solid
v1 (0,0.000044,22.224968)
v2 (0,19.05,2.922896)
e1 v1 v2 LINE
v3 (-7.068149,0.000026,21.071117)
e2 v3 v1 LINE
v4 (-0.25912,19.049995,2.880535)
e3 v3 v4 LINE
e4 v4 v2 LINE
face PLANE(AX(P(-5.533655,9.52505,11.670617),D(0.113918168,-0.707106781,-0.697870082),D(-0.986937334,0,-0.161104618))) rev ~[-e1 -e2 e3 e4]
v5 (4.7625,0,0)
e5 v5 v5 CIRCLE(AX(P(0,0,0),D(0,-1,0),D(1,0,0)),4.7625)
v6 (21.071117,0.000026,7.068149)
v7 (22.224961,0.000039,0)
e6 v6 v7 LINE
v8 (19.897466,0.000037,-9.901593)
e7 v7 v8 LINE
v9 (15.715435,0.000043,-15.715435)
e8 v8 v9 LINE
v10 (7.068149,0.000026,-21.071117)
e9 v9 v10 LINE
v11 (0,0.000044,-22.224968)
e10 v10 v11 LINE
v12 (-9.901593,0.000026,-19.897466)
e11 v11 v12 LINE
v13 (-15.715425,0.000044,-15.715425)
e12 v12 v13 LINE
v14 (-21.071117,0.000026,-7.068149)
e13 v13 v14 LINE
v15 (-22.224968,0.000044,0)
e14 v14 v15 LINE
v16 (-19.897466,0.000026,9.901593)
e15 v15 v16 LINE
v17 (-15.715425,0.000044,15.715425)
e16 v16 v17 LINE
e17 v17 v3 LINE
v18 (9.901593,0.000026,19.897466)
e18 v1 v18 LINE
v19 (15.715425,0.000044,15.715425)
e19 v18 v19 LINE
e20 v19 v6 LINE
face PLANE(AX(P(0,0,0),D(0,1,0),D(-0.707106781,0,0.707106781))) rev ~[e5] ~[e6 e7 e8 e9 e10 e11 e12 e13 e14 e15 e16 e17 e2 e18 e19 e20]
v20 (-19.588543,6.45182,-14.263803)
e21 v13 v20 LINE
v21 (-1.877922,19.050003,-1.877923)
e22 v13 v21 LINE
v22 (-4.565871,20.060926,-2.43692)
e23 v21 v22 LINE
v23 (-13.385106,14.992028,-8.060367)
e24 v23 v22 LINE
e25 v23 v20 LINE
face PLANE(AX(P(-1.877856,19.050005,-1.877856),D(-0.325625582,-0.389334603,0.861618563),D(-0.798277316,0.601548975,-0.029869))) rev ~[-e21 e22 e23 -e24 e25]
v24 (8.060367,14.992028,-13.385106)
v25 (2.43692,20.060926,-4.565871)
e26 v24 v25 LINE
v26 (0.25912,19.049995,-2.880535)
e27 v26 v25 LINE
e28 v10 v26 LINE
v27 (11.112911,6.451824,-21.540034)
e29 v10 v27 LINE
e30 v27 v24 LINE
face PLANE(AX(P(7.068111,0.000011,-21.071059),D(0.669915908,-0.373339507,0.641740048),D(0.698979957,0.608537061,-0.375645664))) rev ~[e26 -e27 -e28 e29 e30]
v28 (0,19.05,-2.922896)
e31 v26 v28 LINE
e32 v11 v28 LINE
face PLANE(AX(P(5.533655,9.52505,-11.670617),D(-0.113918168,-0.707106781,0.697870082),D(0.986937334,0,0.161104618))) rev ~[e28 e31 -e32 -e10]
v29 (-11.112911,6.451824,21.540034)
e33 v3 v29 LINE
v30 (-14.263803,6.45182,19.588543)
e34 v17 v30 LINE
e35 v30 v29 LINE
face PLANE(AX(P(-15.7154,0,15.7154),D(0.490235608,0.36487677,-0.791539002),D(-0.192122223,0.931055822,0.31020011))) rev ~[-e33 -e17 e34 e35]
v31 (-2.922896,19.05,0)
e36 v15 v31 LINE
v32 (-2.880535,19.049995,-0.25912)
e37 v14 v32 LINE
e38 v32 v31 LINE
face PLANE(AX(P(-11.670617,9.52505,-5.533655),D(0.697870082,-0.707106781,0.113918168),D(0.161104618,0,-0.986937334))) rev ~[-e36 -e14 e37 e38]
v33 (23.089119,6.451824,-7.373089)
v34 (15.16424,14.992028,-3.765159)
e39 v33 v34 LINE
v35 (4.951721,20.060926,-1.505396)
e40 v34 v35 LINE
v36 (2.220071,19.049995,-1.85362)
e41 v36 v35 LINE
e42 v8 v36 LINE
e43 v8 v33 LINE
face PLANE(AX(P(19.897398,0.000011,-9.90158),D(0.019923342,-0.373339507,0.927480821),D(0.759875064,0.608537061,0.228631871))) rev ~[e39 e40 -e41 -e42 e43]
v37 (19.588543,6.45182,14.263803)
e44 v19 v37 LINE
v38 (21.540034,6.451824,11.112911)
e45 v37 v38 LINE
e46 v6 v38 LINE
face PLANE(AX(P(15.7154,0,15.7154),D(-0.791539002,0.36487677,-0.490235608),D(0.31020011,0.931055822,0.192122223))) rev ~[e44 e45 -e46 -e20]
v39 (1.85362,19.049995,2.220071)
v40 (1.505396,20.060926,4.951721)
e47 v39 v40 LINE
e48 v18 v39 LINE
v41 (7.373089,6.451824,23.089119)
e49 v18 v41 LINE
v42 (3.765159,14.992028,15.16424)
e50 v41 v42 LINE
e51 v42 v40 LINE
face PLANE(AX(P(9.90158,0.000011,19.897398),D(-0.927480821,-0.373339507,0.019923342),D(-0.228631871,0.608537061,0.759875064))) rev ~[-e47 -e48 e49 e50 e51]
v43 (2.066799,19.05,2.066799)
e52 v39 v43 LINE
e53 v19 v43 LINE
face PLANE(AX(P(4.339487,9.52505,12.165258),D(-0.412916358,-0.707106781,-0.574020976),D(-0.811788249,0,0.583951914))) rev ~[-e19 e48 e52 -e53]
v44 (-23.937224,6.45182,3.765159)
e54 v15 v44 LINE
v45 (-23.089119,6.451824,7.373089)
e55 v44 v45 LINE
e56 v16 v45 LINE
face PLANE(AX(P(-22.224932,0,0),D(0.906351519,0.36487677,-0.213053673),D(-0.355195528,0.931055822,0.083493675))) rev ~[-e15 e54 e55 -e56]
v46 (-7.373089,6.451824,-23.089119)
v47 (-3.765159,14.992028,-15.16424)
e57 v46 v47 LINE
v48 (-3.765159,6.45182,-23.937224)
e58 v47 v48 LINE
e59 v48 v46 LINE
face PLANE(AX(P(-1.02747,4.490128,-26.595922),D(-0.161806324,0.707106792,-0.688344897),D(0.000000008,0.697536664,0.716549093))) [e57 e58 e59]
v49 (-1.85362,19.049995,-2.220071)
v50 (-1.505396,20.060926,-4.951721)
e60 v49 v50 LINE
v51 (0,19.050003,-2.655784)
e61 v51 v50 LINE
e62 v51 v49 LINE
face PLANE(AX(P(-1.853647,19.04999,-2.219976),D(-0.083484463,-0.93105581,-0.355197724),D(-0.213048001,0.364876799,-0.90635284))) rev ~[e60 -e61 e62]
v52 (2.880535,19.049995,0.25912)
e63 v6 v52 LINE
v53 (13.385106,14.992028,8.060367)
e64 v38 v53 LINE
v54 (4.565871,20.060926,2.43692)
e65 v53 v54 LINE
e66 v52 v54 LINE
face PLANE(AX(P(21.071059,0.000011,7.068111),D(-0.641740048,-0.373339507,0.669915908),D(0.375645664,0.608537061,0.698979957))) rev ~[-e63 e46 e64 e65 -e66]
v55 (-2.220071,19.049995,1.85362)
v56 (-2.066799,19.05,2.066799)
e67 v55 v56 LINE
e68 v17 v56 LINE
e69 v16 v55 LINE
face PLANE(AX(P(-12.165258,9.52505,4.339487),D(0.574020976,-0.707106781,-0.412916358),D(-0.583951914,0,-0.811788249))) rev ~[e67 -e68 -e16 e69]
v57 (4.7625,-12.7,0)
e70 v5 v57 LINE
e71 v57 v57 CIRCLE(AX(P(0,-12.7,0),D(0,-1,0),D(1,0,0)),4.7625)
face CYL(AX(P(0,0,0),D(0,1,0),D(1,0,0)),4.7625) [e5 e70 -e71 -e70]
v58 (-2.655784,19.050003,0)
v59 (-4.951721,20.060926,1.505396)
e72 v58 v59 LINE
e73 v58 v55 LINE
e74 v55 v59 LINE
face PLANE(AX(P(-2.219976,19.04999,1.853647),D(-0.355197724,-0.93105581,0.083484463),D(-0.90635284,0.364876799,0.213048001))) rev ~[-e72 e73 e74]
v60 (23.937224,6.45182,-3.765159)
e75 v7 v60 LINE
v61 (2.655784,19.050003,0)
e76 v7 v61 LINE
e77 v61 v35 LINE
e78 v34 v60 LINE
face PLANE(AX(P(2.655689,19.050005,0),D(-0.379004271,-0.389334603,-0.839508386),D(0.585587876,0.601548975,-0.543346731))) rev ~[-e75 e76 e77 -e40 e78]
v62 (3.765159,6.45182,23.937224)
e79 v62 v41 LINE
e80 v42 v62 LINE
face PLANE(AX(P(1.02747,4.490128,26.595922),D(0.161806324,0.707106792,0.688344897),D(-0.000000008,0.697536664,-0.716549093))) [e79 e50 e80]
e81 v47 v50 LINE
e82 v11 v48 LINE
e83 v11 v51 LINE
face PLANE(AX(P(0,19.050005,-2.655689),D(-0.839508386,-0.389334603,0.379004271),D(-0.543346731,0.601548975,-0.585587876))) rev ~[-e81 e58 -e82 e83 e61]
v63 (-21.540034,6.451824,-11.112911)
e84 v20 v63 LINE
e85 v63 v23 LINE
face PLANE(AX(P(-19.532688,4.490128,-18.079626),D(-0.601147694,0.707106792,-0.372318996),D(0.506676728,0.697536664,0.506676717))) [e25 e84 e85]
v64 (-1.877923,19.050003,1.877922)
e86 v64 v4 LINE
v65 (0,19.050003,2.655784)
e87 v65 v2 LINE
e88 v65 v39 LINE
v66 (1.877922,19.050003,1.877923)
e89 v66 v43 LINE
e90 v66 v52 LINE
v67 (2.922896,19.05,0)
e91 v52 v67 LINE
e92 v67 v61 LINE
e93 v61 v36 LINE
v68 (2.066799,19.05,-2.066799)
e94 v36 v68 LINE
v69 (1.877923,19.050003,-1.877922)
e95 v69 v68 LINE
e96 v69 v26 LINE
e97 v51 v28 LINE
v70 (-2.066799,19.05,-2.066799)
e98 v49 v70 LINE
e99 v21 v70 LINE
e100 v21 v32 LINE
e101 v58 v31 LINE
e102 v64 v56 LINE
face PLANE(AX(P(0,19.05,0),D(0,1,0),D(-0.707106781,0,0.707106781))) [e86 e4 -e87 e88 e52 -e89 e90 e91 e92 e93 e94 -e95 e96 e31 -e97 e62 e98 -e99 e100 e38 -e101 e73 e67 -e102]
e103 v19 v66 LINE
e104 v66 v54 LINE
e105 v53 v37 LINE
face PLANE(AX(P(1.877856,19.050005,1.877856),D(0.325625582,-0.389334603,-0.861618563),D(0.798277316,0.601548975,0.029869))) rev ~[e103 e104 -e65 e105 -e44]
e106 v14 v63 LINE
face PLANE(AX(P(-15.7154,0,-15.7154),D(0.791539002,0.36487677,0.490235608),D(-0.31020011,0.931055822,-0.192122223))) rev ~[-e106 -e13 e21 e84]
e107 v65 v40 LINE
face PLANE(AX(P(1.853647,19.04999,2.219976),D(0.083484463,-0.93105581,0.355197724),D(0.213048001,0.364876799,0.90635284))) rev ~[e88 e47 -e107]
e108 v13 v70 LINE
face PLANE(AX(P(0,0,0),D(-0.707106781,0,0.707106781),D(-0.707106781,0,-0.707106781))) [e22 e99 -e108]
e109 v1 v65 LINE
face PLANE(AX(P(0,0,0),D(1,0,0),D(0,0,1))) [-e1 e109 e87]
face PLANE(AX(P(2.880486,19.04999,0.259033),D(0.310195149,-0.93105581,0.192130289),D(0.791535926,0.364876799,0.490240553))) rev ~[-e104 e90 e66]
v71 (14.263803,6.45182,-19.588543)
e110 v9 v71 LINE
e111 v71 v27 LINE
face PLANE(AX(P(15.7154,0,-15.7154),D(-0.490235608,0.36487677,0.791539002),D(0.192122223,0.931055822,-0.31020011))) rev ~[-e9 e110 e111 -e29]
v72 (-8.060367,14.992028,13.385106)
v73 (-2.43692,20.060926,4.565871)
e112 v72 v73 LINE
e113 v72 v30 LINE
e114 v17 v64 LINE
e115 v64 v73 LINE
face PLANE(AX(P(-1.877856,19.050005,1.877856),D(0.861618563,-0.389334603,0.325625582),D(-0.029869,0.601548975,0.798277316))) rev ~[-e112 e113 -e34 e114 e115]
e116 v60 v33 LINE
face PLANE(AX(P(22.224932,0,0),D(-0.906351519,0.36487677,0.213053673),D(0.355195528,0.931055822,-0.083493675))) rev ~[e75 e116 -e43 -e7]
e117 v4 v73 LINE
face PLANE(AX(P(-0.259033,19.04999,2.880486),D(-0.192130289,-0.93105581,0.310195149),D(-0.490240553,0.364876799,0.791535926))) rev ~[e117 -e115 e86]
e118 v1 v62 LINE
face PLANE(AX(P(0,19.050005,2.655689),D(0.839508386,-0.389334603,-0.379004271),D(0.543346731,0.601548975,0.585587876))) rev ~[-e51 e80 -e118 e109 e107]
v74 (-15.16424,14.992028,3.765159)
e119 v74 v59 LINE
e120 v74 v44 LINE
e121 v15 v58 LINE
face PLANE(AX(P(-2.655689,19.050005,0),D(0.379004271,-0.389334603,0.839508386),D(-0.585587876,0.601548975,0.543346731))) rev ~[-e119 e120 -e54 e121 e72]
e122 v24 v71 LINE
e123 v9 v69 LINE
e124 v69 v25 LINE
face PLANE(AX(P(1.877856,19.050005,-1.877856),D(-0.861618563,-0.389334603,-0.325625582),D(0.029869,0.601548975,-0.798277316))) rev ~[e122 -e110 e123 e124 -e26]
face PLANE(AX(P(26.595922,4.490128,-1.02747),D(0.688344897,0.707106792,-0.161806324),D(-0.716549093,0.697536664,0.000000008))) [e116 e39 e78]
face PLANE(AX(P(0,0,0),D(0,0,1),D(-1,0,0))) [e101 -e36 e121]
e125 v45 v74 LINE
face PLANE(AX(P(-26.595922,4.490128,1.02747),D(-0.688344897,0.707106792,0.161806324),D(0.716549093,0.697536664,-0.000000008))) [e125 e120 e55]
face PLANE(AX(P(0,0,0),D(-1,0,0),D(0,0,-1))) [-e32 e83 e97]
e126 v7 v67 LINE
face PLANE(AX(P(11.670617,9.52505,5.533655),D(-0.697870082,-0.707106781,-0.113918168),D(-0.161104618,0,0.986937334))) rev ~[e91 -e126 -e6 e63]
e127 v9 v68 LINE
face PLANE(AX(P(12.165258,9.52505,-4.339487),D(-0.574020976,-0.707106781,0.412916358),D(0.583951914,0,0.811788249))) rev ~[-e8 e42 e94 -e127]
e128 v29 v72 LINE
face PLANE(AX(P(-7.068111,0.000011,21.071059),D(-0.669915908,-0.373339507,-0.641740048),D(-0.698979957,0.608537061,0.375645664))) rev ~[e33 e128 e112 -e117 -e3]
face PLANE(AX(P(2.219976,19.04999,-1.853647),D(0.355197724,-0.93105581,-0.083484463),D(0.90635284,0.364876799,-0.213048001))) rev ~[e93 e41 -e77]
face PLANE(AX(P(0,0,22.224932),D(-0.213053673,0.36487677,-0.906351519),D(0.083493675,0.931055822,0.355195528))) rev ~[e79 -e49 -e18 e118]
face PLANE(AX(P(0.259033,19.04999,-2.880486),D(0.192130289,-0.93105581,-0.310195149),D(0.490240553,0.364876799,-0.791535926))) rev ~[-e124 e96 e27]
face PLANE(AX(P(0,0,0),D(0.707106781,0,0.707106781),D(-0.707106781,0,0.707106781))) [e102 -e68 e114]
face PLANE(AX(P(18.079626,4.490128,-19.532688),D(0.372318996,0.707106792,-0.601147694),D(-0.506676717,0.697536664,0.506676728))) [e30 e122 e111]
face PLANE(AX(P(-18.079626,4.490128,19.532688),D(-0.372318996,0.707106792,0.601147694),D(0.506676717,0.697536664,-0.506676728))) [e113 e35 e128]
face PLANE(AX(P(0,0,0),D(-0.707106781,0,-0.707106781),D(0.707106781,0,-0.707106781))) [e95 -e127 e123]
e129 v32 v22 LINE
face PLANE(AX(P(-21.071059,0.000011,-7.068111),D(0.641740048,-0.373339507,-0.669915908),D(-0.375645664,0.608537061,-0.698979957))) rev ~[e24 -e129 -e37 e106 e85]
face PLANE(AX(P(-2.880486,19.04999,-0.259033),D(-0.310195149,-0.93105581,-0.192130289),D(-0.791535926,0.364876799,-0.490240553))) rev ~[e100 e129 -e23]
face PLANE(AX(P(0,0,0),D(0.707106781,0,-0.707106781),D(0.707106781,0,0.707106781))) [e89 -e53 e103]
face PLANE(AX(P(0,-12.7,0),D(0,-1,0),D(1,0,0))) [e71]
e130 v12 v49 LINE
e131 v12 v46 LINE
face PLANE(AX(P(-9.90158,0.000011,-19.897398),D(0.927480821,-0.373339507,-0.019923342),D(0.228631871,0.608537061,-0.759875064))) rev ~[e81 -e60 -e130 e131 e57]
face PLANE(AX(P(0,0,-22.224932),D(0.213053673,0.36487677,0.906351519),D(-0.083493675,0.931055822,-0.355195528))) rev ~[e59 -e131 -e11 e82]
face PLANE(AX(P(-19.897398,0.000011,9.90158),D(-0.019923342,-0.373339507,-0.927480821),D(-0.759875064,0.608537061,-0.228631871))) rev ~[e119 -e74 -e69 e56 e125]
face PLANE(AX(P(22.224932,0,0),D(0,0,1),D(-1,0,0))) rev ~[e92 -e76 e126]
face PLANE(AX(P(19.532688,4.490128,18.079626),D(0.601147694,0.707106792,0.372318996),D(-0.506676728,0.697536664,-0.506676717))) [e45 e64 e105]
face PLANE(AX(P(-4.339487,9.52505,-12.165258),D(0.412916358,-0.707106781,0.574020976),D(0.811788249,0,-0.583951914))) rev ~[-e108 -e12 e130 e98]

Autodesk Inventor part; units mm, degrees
ref_plane "YZ Plane" through (0, 0, 0) normal (1, 0, 0) x (0, 1, 0)
ref_plane "XZ Plane" through (0, 0, 0) normal (0, 1, 0) x (-1, 0, 0)
ref_plane "XY Plane" through (0, 0, 0) normal (0, 0, 1) x (1, 0, 0)
sketch "Sketch7" plane through (0, 0, 0) normal (0, 1, 0) x (-1, 0, 0)
  line L0 (0, 0) -> (-22.225, 0)
  line L1 (0, 0) -> (-15.7154, -15.7154) construction
  line L2 (0, 0) -> (-22.225, 0) construction
  line L3 (-22.225, 0) -> (-19.8975, -9.9016)
  line L4 (-19.8975, -9.9016) -> (-15.7154, -15.7154)
  line L5 (-15.7154, -15.7154) -> (0, 0)
  dimension "d25" = 22.225
  dimension "d26" = 45
extrude "Extrusion6" add sketch "Sketch7" along normal blind 19.05
chamfer "Chamfer2" distance 19.05 angle 45 2 edges at (17.8065, 19.05, -12.8085) (21.0612, 19.05, -4.9508)
pattern_circular "Circular Pattern3" count 8 over 360 about axis through (0, 0, 0) along (0, 1, 0) of "Extrusion6", "Chamfer2"
sketch "Sketch8" plane through (-15.7154, 0, -15.7154) normal (-0.6011477, 0.7071068, -0.372319) x (0.5066767, 0.6975367, 0.5066767)
  line L0 (0, 0) -> (1.6678, -10.0338)
  line L1 (1.6678, -10.0338) -> (27.6226, -1.8784)
  line L2 (27.6226, -1.8784) -> (1.6678, -10.0338) projected
  line L3 (27.6226, -1.8784) -> (27.3104, 0)
  line L4 (27.3104, 0) -> (0, 0)
  line L5 (0, 0) -> (27.3104, 0) projected
  point P0 (15.9253, -2.5084)
extrude "Extrusion7" add sketch "Sketch8" along normal blind 6.35 draft -23.6
sketch "Sketch9" plane through (0, 0, 0) normal (0, -1, 0) x (1, 0, 0)
  circle A0 centre (0, 0) radius 4.7625
  dimension "d37" = 9.525
extrude "Extrusion8" add sketch "Sketch9" along normal blind 12.7
pattern_circular "Circular Pattern4" count 8 over 360 about axis through (0, 0, 0) along (0, -1, 0) of "Extrusion7"
properties part number "Beveled_Gear"
